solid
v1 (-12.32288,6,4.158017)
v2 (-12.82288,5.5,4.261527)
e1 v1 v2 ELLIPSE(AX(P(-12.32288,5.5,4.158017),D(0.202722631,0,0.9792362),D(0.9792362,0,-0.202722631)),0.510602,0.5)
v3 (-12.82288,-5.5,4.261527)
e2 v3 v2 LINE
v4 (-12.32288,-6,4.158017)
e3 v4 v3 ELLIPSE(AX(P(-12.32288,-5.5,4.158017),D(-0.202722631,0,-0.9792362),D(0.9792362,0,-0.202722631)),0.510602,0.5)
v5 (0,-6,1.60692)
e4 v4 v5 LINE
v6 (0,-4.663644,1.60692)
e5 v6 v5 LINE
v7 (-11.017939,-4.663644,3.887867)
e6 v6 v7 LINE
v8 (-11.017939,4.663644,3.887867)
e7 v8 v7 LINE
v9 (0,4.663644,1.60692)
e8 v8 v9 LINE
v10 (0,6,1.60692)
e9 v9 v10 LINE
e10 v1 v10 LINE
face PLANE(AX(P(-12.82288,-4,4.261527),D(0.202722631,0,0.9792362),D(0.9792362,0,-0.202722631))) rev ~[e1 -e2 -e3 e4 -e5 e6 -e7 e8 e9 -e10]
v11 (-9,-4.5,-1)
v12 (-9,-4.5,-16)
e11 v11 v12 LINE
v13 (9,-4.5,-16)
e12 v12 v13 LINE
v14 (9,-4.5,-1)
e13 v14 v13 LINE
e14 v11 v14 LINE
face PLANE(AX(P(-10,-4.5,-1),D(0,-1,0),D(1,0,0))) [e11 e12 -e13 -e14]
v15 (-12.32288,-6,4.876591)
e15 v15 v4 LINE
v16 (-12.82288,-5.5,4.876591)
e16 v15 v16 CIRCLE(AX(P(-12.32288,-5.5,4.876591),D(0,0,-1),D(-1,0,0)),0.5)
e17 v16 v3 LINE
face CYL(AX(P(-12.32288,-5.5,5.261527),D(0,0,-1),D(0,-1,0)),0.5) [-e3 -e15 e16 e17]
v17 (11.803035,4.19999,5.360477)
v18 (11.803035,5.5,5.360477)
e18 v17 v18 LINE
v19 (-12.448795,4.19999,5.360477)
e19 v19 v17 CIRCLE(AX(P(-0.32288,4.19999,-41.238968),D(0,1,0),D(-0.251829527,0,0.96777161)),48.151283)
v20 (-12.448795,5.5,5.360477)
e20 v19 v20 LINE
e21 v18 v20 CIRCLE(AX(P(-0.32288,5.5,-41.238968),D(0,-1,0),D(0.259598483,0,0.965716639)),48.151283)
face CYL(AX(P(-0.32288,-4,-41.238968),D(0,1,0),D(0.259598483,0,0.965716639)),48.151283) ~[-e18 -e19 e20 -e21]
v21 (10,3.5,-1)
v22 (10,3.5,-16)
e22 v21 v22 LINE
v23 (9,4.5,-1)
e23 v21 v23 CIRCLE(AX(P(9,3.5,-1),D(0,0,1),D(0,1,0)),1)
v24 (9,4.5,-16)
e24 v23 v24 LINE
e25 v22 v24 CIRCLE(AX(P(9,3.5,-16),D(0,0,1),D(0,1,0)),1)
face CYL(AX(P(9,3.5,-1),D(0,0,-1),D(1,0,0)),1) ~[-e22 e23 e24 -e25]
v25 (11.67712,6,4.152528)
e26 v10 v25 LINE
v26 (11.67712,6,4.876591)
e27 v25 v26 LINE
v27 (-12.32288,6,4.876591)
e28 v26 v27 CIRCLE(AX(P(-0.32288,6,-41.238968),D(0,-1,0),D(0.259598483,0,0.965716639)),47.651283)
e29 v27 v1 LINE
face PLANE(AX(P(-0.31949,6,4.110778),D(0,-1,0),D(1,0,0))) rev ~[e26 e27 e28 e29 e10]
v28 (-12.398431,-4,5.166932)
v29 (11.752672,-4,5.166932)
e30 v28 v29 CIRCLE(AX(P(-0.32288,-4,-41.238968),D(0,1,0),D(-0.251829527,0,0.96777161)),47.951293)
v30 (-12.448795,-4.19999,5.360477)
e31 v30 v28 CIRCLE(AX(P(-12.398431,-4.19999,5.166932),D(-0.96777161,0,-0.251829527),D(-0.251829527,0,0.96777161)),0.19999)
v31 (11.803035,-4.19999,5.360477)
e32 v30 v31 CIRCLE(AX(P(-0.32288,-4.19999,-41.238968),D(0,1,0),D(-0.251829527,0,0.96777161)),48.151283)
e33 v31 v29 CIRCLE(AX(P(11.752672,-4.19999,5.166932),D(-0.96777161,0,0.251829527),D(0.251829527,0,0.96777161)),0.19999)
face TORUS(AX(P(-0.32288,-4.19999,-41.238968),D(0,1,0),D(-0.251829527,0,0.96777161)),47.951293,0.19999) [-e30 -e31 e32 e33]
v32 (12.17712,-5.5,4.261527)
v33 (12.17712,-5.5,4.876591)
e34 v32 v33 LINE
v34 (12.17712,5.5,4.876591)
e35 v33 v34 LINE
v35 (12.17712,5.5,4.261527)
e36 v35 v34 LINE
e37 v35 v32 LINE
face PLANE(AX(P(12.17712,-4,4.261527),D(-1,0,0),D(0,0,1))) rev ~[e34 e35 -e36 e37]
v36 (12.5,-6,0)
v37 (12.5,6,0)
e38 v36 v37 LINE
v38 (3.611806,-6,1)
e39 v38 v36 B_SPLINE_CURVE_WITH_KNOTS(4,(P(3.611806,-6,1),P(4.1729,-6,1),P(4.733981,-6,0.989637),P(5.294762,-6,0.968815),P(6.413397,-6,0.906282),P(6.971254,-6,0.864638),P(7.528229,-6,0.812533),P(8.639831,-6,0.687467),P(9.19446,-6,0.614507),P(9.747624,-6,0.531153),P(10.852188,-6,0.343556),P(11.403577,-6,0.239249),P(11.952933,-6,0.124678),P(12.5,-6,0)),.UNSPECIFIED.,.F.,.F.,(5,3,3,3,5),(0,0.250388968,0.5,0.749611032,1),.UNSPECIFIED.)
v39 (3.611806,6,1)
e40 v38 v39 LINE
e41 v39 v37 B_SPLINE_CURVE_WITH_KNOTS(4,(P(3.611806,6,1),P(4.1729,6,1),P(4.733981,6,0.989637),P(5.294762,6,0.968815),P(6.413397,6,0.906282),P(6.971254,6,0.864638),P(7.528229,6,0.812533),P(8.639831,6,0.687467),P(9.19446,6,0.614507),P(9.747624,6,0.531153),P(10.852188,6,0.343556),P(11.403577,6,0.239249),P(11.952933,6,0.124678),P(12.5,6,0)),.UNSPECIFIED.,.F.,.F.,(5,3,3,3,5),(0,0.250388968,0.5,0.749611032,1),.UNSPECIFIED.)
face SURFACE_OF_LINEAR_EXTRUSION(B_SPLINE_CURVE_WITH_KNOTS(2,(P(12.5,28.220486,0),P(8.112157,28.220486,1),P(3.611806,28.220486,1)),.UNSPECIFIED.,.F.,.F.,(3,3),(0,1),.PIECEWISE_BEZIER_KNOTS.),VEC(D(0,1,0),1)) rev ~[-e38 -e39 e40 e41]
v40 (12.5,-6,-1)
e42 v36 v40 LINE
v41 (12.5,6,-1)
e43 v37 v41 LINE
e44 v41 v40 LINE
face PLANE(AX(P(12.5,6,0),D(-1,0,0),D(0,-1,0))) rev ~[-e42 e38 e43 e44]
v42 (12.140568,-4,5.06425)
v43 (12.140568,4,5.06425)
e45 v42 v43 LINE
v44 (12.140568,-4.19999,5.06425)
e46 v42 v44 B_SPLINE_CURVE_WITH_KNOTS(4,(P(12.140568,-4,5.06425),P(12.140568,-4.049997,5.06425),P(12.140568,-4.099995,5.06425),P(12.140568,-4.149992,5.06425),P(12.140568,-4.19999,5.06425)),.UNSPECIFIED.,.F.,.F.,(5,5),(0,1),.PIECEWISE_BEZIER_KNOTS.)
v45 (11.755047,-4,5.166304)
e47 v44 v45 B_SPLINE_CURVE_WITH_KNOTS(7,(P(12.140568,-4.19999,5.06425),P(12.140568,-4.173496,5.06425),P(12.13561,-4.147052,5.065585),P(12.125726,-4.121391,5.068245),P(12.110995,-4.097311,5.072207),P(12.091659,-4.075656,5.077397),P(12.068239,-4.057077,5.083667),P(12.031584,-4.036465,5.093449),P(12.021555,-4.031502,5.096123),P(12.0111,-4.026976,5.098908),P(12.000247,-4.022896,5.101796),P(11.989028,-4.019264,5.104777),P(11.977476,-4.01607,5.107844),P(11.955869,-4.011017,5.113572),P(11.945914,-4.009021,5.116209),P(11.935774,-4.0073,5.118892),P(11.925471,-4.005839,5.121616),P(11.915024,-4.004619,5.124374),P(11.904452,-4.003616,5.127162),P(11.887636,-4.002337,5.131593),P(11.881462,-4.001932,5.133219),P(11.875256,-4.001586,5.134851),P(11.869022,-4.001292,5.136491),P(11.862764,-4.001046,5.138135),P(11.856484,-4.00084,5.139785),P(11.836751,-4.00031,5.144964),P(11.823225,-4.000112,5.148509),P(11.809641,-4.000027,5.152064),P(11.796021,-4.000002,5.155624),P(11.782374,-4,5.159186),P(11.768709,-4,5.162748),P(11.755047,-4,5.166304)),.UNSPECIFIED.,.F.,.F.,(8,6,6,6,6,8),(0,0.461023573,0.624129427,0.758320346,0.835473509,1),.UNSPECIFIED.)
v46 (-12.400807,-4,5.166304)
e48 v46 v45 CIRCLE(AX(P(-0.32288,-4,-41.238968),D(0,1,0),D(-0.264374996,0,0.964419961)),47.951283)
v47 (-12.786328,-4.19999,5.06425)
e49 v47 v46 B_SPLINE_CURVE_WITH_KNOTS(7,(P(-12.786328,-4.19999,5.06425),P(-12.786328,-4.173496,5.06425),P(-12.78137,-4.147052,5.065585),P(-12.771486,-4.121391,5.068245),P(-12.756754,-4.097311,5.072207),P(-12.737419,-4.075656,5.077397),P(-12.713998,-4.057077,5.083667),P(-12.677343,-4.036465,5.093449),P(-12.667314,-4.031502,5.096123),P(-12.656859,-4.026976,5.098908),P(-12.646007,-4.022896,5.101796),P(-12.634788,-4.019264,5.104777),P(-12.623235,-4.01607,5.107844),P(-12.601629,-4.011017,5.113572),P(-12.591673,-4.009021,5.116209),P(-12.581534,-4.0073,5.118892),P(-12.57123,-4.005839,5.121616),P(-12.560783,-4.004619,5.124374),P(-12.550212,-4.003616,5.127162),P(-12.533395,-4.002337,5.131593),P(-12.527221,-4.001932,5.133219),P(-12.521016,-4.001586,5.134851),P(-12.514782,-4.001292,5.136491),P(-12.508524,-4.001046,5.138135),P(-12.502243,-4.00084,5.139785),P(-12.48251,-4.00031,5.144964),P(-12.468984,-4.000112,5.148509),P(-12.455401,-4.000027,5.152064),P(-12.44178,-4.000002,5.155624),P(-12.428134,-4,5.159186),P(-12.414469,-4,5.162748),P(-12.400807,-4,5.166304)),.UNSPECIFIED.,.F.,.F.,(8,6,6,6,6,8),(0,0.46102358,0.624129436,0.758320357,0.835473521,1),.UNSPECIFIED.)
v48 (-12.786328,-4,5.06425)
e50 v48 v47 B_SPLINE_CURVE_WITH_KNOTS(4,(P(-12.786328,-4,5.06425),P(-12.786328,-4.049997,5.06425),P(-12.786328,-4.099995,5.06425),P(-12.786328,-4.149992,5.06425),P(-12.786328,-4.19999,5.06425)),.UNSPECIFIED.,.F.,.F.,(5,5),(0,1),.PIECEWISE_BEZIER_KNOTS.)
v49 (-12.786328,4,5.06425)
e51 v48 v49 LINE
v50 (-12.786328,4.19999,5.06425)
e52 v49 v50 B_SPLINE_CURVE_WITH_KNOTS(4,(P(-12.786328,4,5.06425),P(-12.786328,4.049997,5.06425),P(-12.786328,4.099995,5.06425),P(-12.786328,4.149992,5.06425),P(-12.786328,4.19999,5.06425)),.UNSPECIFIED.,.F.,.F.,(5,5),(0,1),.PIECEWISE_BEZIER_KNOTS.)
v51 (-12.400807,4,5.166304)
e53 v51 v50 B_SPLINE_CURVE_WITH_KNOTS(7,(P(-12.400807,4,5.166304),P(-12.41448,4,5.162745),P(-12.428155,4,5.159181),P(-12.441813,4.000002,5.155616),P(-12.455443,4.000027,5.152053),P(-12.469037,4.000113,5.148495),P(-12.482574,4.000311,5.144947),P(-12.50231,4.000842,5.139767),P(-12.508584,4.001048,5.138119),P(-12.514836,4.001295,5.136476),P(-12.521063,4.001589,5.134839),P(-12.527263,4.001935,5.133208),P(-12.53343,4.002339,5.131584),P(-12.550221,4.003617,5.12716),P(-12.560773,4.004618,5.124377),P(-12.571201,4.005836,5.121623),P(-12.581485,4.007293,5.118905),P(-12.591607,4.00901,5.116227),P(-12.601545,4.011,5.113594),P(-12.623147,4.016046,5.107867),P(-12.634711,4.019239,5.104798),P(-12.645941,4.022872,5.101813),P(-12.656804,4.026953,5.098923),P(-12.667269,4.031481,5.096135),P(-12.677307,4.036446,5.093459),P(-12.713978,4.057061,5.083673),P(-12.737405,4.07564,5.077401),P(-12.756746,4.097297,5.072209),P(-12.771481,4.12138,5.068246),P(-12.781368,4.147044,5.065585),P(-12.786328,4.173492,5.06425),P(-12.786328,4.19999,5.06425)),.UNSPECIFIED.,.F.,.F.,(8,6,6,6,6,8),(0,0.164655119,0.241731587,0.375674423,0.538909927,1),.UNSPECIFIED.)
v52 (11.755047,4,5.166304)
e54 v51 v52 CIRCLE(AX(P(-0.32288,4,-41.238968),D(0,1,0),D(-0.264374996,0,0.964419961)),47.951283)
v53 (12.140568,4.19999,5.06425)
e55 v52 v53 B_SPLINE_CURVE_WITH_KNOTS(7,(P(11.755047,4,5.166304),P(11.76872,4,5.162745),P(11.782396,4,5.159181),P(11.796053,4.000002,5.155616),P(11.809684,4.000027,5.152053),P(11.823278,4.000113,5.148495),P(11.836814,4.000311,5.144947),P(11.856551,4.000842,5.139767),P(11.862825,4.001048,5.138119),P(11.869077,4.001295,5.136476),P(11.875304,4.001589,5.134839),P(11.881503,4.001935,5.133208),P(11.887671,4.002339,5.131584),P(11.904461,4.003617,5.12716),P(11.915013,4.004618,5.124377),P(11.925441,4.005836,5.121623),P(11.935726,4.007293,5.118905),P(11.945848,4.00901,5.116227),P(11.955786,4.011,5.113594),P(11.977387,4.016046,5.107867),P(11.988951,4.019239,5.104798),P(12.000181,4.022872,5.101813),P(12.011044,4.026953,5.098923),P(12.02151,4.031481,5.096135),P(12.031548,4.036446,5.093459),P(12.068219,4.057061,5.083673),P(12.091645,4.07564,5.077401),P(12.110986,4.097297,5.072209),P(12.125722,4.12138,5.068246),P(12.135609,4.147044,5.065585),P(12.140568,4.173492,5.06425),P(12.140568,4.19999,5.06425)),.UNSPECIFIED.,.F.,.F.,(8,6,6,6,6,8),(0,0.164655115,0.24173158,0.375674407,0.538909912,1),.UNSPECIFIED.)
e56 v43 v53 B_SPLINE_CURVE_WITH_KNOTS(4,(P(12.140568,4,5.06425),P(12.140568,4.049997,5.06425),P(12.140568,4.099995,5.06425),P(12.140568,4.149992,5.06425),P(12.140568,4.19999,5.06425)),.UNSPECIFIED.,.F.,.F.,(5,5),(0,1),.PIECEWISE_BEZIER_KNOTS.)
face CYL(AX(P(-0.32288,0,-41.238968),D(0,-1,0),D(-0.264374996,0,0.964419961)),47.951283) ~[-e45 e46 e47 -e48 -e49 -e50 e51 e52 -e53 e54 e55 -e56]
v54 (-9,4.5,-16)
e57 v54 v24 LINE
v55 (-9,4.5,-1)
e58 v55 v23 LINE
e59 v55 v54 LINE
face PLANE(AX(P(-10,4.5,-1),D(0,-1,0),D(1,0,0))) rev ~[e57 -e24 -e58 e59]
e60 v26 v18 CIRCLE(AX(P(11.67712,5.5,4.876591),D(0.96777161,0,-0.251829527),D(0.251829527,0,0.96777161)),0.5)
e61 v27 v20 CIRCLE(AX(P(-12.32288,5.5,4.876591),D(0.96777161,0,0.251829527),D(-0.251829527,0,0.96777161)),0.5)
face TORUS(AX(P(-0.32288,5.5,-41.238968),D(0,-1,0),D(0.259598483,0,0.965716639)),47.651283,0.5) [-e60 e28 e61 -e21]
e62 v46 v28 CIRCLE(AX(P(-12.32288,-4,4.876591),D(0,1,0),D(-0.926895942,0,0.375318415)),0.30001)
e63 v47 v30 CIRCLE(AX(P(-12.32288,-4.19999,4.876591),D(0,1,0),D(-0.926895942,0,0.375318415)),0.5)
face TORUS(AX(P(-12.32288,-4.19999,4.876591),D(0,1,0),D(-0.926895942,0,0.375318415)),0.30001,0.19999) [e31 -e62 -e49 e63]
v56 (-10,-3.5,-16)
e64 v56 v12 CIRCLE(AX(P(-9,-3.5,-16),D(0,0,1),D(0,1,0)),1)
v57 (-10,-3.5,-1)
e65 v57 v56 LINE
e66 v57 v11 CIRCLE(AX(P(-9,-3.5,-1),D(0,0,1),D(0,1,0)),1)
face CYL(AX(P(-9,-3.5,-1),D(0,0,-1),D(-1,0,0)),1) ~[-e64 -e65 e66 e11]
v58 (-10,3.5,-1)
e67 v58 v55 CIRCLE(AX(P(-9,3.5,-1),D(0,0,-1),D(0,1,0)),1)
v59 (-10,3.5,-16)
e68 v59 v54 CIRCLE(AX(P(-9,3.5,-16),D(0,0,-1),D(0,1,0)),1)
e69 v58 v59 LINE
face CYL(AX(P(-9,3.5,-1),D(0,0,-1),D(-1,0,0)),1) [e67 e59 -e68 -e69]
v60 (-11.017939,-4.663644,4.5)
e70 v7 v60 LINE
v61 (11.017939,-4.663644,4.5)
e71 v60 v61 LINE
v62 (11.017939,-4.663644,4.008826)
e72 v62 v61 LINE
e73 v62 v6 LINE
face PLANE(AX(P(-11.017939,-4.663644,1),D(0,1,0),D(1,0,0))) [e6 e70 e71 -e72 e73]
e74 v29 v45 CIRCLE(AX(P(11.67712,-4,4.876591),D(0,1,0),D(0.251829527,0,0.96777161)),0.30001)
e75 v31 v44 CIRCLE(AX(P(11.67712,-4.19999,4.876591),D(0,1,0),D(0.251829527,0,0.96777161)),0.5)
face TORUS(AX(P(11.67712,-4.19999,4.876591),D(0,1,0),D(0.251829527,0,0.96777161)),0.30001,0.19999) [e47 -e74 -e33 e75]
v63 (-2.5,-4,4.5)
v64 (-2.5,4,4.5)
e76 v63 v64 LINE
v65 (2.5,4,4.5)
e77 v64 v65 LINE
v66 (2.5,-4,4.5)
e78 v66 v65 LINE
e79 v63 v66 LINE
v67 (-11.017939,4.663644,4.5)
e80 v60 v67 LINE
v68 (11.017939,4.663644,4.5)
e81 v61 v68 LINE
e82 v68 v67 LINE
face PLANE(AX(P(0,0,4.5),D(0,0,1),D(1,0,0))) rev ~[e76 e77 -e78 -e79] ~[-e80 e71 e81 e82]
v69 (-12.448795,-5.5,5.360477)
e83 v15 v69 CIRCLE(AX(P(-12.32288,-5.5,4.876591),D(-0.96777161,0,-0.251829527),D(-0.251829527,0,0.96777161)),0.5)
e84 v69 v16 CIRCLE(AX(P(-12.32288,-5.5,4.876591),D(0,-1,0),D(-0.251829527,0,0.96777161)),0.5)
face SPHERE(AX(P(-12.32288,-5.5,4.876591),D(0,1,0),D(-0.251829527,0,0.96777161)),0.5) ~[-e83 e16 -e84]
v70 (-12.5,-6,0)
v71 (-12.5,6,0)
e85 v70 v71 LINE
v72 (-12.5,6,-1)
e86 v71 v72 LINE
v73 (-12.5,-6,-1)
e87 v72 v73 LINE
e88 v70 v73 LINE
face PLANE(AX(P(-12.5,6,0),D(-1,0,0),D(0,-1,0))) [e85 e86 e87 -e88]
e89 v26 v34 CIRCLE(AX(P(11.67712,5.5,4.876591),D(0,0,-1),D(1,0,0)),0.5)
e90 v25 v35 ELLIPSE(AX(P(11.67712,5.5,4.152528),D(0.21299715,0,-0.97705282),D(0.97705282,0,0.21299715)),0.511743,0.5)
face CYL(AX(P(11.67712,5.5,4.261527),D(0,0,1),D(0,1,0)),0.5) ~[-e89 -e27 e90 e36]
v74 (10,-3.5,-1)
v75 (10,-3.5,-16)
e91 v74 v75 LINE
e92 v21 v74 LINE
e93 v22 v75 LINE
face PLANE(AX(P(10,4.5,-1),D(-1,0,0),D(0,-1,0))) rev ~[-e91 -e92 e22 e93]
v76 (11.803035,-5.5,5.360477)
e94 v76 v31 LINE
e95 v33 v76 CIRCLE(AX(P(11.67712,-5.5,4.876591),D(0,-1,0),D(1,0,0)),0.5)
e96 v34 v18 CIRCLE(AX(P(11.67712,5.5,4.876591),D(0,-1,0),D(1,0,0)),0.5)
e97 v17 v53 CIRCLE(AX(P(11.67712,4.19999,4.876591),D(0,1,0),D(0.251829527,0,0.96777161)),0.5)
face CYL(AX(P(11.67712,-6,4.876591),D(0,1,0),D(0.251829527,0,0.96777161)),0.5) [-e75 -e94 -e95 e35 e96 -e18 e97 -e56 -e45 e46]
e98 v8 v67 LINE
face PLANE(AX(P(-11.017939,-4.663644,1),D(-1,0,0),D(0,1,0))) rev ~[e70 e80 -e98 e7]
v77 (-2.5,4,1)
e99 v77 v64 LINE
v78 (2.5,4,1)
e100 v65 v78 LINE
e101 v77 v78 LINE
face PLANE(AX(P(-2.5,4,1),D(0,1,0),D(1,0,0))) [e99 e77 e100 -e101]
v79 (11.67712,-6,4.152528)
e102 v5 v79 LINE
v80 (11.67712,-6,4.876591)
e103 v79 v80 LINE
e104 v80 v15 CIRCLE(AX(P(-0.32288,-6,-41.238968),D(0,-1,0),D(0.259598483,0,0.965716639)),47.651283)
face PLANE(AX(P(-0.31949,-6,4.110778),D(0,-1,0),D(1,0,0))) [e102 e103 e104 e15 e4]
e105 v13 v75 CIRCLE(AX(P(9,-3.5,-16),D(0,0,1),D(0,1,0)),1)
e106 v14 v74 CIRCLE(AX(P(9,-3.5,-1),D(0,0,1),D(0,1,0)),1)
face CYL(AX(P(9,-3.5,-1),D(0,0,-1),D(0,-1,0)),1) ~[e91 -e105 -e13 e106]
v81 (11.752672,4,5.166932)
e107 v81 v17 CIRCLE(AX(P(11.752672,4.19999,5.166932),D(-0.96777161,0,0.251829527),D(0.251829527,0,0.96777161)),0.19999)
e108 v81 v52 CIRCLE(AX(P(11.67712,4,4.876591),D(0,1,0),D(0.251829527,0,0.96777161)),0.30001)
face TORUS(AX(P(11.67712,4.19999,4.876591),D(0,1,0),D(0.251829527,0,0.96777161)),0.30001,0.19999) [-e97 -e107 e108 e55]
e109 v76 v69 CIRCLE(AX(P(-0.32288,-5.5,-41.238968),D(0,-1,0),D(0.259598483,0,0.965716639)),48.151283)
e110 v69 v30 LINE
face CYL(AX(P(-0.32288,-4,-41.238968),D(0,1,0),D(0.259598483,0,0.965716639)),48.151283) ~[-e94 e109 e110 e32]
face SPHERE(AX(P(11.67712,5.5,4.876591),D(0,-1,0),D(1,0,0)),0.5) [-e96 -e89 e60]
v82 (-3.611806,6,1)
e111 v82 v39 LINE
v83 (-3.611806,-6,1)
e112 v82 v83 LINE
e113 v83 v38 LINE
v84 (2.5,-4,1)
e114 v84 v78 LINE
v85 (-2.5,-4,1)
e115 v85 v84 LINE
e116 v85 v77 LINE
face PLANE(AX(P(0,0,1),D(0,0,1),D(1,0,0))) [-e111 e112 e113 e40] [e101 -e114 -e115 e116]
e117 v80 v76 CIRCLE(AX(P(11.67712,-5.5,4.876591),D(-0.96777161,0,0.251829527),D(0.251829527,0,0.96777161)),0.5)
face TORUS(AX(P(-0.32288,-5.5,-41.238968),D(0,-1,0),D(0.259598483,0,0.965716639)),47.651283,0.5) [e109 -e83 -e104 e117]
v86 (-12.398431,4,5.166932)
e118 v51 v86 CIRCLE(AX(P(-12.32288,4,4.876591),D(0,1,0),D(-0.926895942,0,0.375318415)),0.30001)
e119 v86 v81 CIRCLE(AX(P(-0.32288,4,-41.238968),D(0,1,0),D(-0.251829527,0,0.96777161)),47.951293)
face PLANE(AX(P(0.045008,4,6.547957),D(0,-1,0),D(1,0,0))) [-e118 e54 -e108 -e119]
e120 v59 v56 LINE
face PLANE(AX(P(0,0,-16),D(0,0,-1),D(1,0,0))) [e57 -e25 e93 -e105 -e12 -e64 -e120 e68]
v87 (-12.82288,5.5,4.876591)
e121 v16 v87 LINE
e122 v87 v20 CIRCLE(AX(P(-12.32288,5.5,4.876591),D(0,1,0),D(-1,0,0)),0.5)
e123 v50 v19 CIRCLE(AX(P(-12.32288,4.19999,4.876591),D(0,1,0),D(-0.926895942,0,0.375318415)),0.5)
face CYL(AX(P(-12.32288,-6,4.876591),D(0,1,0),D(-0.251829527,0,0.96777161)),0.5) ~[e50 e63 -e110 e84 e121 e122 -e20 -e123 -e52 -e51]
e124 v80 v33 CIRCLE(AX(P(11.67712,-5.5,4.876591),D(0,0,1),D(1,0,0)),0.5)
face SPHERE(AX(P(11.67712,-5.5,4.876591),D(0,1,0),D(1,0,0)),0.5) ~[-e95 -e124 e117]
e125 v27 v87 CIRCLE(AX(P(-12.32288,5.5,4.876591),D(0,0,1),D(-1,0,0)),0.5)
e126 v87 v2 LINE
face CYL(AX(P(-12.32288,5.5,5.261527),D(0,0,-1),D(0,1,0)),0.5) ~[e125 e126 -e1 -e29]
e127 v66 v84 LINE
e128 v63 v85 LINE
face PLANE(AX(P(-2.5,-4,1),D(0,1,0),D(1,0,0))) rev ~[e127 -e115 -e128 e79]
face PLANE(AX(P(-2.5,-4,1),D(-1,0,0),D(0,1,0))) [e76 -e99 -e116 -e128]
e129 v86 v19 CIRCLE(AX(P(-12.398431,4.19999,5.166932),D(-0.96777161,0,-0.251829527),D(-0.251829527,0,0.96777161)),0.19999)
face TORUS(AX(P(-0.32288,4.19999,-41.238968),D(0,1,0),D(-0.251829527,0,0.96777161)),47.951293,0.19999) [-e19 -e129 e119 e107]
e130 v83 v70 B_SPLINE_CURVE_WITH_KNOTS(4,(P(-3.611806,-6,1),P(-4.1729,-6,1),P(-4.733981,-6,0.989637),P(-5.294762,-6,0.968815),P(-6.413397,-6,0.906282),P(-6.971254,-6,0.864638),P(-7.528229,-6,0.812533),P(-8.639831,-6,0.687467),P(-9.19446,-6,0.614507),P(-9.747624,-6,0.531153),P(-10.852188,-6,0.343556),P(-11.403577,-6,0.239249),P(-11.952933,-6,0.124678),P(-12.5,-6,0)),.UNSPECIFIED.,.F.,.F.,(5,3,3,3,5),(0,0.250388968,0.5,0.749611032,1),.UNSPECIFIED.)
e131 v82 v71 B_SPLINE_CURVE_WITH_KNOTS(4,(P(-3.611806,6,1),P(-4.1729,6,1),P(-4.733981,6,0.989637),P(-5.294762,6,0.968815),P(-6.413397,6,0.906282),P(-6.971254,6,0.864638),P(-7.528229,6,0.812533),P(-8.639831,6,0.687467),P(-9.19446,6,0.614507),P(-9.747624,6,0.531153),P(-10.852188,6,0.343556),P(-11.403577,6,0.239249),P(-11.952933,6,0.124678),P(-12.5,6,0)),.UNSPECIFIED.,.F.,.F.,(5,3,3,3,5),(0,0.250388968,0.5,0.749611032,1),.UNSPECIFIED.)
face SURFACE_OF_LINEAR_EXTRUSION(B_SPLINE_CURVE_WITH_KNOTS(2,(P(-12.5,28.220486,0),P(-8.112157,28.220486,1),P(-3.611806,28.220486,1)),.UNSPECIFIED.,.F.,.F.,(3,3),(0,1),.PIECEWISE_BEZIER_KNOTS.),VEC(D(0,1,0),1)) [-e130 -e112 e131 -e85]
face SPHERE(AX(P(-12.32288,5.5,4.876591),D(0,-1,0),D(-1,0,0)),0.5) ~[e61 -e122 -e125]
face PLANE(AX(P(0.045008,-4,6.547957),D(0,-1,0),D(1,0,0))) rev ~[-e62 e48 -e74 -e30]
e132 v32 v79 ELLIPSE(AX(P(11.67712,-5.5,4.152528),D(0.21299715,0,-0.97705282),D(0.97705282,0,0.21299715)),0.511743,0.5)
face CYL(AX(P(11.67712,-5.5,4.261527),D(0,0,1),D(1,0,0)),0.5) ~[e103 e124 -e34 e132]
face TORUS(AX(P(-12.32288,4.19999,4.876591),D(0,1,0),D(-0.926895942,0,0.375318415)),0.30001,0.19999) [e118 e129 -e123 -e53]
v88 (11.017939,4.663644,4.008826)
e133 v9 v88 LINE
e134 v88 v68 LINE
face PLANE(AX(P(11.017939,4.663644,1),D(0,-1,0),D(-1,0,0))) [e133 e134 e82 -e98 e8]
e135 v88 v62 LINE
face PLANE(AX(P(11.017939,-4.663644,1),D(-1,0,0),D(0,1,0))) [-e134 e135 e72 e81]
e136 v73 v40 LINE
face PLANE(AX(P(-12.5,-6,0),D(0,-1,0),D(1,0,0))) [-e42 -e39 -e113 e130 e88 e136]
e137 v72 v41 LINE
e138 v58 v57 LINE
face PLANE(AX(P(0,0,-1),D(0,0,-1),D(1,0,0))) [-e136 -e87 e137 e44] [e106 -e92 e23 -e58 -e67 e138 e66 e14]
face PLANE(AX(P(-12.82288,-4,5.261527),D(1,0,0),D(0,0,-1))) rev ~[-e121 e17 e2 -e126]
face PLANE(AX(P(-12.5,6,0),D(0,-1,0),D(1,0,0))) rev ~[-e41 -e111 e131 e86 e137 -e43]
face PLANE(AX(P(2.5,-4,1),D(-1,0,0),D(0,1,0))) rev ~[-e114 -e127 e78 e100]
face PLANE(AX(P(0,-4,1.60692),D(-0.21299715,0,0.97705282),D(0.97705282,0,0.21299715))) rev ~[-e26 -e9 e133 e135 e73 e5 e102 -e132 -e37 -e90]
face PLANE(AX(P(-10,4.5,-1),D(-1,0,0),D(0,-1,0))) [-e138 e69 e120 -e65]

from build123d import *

# Parameters (mm, degrees)
F0_W           = 25
F0_H           = 12
F1_DEPTH       = 1
F2_T1_DEPTH    = 56.4409720866
F1_FACE_W      = 25
F1_FACE_H      = 12
F3_DEPTH       = 1
F4_W           = 20
F4_H           = 9
F5_DEPTH       = 15
F6_W           = 5
F6_H           = 8
F7_DEPTH       = 4
F10_DEPTH      = 10
F10_DEPTH_BACK = 2
F11_R          = 0.5
F12_W          = 22.0358781517
F12_H          = 9.327288717
F12_W_2        = 5
F12_H_2        = 8
F12_W_3        = 7.4061334931
F13_DEPTH      = 3.5
F16_R          = 1
F18_DEPTH      = 4
F19_R          = 0.19999


# Not quite as in the source:
# - a fillet or chamfer that OpenCascade refuses, or shapes differently, is made with other operations: its cross-section is extruded or revolved along the edge and cut away or added
# - a fillet or chamfer is up to 0.001 mm smaller than in the source, because OpenCascade refuses the exact size
# - the program builds the solid bodies; features that only make, move or delete a surface that nothing else refers to are left out


with BuildPart() as f1:
    # F0 (on Top) → F1 (new body)
    with BuildSketch(Plane.XY):
        Rectangle(F0_W, F0_H)
    extrude(amount=F1_DEPTH)

    # F2: fillet of radius 40 on 2 edges, made by hand

    # F2_s2 → F2_t1 (cut)
    with BuildSketch(Plane.XZ.offset(-28.2204860433)):
        with BuildLine():
            add(Edge.make_bspline(
                [(12.5, 0), (8.1121571864, 1), (3.6118055827, 1)],
                knots=[0, 0, 0, 1, 1, 1], degree=2, weights=[1, 1, 1]))
            Line((3.6118055827, 1), (3.6118055827, 1.8))
            Line((3.6118055827, 1.8), (12.5, 1.8))
            Line((12.5, 1.8), (13.3, 1))
            ThreePointArc((13.3, 1), (13.3, 0.5), (12.6777638883, 0.78))
            Line((12.6777638883, 0.78), (12.5, 0))
        make_face()
        with BuildLine():
            add(Edge.make_bspline(
                [(-12.5, 0), (-8.1121571864, 1), (-3.6118055827, 1)],
                knots=[0, 0, 0, 1, 1, 1], degree=2, weights=[1, 1, 1]))
            Line((-3.6118055827, 1), (-3.6118055827, 1.8))
            Line((-3.6118055827, 1.8), (-12.5, 1.8))
            Line((-12.5, 1.8), (-13.3, 1))
            ThreePointArc((-13.3, 1), (-13.3, 0.5), (-12.6777638883, 0.78))
            Line((-12.6777638883, 0.78), (-12.5, 0))
        make_face()
    extrude(amount=F2_T1_DEPTH, mode=Mode.SUBTRACT)

    # F1_face (on face) + F0 (on Top) → F3 (join)
    with BuildSketch(Plane(origin=(0, 0, 0), x_dir=(1, 0, 0), z_dir=(0, 0, -1))):
        Rectangle(F1_FACE_W, F1_FACE_H)
    with BuildSketch(Plane.XY):
        Rectangle(F0_W, F0_H)
    extrude(amount=F3_DEPTH, dir=(0, 0, -1))

    # F4 (on face) → F5 (join)
    with BuildSketch(Plane(origin=(0, 0, -1), x_dir=(1, 0, 0), z_dir=(0, 0, -1))):
        Rectangle(F4_W, F4_H)
    extrude(amount=F5_DEPTH)

    # F6 (on face) → F7 (join)
    with BuildSketch(Plane.XY.offset(1)):
        Rectangle(F6_W, F6_H)
    extrude(amount=F7_DEPTH)

    # F9 (on face) → F10 (join, two sides)
    with BuildSketch(Plane.XZ.offset(4)) as f10_sk:
        Polygon((-12.8228797714, 4.2615274688), (0, 1.6069198027), (12.1771202286, 4.2615274688), (12.1771202286, 5.2615274688), (-12.8228797714, 5.2615274688), align=None)
        with BuildLine():
            Line((-12.8228797714, 5.2615274688), (12.1771202286, 5.2615274688))
            ThreePointArc((12.1771202286, 5.2615274688), (-0.3228797714, 6.9123152663), (-12.8228797714, 5.2615274688))
        make_face()
    extrude(amount=-F10_DEPTH)
    extrude(f10_sk.sketch, amount=F10_DEPTH_BACK)

    # F11
    f11_edges = [f1.edges().sort_by_distance(p)[0] for p in [
        (-0.32288, 6, 6.912315),
        (-12.82288, 0, 5.261527),
        (-0.32288, -6, 6.912315),
        (12.17712, 0, 5.261527),
        (12.17712, -6, 4.761527),
        (-12.82288, -6, 4.761527),
        (-12.82288, 6, 4.761527),
        (12.17712, 6, 4.761527),
    ]]
    fillet(f11_edges, radius=F11_R)

    # F12 (on face) → F13 (cut)
    with BuildSketch(Plane.XY.offset(1)):
        Rectangle(F12_W, F12_H)
        Rectangle(F12_W_2, F12_H_2, mode=Mode.SUBTRACT)
        with Locations((-7.3148723293, 0)):
            Rectangle(F12_W_3, F12_H)
    extrude(amount=F13_DEPTH, mode=Mode.SUBTRACT)

    # F16
    f16_edges = [f1.edges().sort_by_distance(p)[0] for p in [
        (-10, -4.5, -8.5),
        (10, -4.5, -8.5),
        (-10, 4.5, -8.5),
        (10, 4.5, -8.5),
    ]]
    fillet(f16_edges, radius=F16_R)

    # F17 (on Front) → F18 (cut, symmetric)
    with BuildSketch(Plane.XZ):
        with BuildLine():
            Line((-13, 7.209603209), (-13, 5.0062067558))
            ThreePointArc((-13, 5.0062067558), (0.0125633764, 6.7111419558), (13, 4.8243193332))
            Line((13, 4.8243193332), (13, 7.209603209))
            Line((13, 7.209603209), (-13, 7.209603209))
        make_face()
    extrude(amount=F18_DEPTH, both=True, mode=Mode.SUBTRACT)

    # F19 (radius 0.2 in the source; OpenCascade refuses exactly that, so slightly less here)
    f19_edges = [f1.edges().sort_by_distance(p)[0] for p in [
        (-0.32288, -4, 6.912315),
        (-0.32288, 4, 6.912315),
    ]]
    fillet(f19_edges, radius=F19_R)


solid = f1.part
